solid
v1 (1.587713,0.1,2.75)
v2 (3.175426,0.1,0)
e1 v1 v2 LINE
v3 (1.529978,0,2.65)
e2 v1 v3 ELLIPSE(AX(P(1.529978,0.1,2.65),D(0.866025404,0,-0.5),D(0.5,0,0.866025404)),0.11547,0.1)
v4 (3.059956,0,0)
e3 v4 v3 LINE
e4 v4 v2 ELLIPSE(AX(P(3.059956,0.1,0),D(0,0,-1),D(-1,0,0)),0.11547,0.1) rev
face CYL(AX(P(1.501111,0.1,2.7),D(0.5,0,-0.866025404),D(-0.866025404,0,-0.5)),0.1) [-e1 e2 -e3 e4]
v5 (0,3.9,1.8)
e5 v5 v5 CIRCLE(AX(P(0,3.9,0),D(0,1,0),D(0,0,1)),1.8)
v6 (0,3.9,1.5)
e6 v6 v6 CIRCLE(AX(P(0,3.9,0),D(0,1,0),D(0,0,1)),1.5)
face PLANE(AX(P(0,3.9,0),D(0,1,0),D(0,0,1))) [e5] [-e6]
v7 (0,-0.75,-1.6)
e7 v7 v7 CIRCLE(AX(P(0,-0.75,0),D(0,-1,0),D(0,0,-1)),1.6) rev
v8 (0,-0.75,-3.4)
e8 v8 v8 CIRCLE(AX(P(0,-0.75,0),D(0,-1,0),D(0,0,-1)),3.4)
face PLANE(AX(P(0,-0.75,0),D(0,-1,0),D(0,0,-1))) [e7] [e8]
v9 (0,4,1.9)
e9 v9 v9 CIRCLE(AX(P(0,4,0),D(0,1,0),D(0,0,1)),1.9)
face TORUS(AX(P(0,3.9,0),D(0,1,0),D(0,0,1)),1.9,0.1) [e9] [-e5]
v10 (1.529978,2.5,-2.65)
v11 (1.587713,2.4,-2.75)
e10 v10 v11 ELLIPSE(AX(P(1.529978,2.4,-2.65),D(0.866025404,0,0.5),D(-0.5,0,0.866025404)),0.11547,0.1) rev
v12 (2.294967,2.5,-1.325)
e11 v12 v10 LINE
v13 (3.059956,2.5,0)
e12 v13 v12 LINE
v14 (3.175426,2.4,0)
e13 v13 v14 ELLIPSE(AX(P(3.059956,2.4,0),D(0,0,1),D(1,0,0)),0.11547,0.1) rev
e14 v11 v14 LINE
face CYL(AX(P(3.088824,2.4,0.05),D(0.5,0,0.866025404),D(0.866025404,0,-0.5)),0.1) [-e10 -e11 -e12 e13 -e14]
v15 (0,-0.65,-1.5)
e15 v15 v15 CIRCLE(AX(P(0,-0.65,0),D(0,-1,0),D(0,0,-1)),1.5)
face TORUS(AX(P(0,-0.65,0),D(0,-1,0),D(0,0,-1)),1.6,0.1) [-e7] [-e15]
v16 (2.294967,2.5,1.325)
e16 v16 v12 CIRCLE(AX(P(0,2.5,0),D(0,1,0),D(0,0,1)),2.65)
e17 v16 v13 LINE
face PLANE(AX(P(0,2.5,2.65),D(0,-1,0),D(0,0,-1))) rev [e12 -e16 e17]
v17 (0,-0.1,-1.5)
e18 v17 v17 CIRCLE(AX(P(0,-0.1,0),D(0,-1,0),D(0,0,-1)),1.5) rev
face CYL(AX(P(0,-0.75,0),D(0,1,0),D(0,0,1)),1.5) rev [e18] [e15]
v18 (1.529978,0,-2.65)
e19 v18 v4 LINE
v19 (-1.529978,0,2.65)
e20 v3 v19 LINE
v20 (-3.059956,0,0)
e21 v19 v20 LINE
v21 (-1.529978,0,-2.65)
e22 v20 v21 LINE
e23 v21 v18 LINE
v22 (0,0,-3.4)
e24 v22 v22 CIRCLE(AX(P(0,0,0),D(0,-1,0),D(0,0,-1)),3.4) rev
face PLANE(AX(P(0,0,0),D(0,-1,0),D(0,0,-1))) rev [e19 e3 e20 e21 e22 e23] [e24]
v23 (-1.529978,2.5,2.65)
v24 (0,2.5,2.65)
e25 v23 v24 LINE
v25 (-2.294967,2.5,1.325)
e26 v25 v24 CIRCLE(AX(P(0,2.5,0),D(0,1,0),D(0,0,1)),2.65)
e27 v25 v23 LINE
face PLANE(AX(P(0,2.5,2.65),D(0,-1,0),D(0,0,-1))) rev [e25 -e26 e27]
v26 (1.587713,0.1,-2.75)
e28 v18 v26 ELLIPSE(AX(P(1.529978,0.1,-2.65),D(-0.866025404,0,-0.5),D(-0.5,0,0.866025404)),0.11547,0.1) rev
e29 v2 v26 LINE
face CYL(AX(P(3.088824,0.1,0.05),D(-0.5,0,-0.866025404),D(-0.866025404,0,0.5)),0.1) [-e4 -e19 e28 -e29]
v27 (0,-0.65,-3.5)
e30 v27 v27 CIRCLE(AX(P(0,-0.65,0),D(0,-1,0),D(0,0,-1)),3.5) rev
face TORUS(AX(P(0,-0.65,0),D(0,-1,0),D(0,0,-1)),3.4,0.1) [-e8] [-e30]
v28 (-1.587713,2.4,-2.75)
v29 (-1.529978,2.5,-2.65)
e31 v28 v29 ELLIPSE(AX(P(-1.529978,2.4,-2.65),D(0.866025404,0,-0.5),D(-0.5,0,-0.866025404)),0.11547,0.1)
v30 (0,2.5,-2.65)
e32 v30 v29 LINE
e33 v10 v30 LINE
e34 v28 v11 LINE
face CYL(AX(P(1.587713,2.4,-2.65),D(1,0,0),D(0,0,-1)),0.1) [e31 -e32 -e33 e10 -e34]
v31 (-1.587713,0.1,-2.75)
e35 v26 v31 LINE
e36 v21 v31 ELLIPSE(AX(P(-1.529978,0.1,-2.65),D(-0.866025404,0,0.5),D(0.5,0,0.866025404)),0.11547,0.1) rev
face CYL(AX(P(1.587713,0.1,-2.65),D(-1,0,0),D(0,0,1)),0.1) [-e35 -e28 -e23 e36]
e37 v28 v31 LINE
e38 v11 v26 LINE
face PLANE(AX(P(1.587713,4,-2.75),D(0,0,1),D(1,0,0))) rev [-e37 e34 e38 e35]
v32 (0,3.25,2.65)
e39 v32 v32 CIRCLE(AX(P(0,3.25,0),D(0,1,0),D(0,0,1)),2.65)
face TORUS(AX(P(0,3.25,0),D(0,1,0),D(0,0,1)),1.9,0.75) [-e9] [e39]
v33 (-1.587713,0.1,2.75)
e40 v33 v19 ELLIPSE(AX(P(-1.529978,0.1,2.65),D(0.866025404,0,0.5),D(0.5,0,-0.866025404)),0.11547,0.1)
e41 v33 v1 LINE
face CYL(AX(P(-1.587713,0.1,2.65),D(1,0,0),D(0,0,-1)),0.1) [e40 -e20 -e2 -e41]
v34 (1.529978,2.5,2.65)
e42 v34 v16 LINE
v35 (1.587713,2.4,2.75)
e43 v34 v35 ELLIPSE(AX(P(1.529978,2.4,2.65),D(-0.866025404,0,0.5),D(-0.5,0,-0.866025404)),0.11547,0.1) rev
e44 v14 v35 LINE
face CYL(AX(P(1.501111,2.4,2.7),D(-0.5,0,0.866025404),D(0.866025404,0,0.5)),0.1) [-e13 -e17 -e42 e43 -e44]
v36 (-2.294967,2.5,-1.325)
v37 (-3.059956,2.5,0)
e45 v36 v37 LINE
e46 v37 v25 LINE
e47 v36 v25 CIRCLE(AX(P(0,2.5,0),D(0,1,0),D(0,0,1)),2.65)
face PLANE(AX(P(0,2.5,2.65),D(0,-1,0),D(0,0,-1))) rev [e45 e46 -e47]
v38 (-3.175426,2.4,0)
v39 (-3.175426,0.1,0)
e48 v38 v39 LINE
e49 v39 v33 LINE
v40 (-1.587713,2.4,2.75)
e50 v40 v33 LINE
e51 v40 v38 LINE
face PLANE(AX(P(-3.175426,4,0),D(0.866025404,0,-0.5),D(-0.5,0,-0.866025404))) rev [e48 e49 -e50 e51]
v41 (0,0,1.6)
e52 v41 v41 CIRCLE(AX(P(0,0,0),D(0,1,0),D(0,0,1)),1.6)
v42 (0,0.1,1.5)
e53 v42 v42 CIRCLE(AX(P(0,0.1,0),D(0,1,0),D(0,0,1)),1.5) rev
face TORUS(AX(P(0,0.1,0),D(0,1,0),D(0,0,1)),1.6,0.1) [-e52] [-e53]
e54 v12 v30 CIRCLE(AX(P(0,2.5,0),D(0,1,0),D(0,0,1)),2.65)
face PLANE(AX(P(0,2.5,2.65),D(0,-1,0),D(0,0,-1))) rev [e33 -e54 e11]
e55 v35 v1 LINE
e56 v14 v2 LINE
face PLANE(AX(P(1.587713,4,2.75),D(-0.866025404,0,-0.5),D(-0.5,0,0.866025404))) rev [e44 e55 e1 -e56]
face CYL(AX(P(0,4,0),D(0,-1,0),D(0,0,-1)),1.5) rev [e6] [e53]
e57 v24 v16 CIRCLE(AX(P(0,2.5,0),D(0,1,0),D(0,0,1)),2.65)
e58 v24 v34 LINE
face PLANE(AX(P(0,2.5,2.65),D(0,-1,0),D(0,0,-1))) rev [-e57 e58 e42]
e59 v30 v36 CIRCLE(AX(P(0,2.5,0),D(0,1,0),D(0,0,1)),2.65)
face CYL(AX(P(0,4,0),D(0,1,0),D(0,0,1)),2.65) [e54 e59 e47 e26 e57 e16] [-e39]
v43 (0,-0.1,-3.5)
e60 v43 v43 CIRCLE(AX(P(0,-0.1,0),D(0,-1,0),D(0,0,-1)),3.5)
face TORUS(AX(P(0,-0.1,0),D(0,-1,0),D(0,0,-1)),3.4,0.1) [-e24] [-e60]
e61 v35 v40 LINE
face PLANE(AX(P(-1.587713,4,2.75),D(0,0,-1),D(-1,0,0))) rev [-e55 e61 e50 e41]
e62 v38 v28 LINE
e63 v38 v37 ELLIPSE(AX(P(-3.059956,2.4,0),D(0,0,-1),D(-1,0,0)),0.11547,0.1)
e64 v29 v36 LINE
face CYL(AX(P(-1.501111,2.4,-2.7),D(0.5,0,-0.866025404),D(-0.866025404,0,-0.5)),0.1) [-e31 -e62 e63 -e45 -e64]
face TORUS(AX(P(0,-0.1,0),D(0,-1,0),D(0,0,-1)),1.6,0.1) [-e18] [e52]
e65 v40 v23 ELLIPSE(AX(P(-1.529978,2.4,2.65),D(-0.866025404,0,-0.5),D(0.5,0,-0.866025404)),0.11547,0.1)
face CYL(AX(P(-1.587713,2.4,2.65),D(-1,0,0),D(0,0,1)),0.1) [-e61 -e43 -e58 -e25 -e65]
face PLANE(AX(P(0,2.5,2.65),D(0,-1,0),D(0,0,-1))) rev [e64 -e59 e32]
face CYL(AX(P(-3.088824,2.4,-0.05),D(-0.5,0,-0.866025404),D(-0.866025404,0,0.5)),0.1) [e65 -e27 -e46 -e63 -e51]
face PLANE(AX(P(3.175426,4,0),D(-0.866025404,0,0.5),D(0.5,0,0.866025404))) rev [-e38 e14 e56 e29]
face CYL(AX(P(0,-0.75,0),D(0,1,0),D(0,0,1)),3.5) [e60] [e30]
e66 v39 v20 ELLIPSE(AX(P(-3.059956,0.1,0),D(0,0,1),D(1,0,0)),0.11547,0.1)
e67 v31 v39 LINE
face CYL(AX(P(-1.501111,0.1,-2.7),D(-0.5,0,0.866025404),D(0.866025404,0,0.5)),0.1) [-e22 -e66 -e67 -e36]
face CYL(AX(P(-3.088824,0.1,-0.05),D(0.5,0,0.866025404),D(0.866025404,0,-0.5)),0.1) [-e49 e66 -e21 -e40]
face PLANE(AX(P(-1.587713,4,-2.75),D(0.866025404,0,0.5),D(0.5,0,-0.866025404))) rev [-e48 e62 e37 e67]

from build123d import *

# Parameters (mm, degrees)
SKETCH1_R           = 1.5
BOSS_EXTRUDE1_DEPTH = 4
FILLET1_R           = 0.1
CUT_EXTRUDE1_START  = -0.1
SKETCH3_R           = 1.8
SKETCH3_R_2         = 1.5
CUT_EXTRUDE1_DEPTH  = 0.1
FILLET2_R           = 0.1
BOSS_EXTRUDE2_START = 0.75
SKETCH4_R           = 3.5
SKETCH4_R_2         = 1.5
BOSS_EXTRUDE2_DEPTH = 0.75
FILLET3_R           = 0.1


# Some blends are built 0.0001 mm under size
with BuildPart() as part:
    # Sketch1 → Boss-Extrude1 (new body)
    with BuildSketch(Plane(origin=(0, 0, 0), x_dir=(1, 0, 0), z_dir=(0, 1, 0))):
        Polygon((1.58771324, -2.75), (3.175426481, 0), (1.58771324, 2.75), (-1.58771324, 2.75), (-3.175426481, 0), (-1.58771324, -2.75), align=None)
        with Locations(Location((0, 0, 0), (0, 0, 270))):
            Circle(SKETCH1_R, mode=Mode.SUBTRACT)
    extrude(amount=BOSS_EXTRUDE1_DEPTH)

    # Sketch2 → Cut-Revolve3 (revolve, cut)
    with BuildSketch(Plane(origin=(0, 0, 0), x_dir=(0, 0, -1), z_dir=(1, 0, 0))):
        with BuildLine():
            Line((-2.65, 3.25), (-2.65, 2.5))
            Line((-2.65, 2.5), (-5.25, 2.5))
            Line((-5.25, 2.5), (-5.25, 4))
            Line((-5.25, 4), (-5.25, 4.1))
            Line((-5.25, 4.1), (-1.9, 4.1))
            Line((-1.9, 4.1), (-1.9, 4))
            ThreePointArc((-1.9, 4), (-2.430330086, 3.780330086), (-2.65, 3.25))
        make_face()
    revolve(axis=Axis((0, 4, 0), (0, -1, 0)), mode=Mode.SUBTRACT)

    # Fillet1
    fillet1_edges = [part.edges().sort_by_distance(p)[0] for p in [
        (0, 0, -1.5),
        (-2.38156986, 2.5, 1.375),
        (2.38156986, 2.5, 1.375),
        (0, 2.5, 2.75),
        (-2.38156986, 2.5, -1.375),
        (0, 2.5, -2.75),
        (2.38156986, 2.5, -1.375),
        (-2.38156986, 0, 1.375),
        (-2.38156986, 0, -1.375),
        (0, 0, -2.75),
        (2.38156986, 0, -1.375),
        (2.38156986, 0, 1.375),
        (0, 0, 2.75),
    ]]
    fillet(fillet1_edges, radius=FILLET1_R - 0.0001)  # a hair under: the kernel refuses the full size

    # Sketch3 → Cut-Extrude1 (cut)
    with BuildSketch(Plane(origin=(0, 4, 0), x_dir=(1, 0, 0), z_dir=(0, 1, 0)).offset(CUT_EXTRUDE1_START)):
        with Locations(Location((0, 0, 0), (0, 0, 270))):
            Circle(SKETCH3_R)
        with Locations(Location((0, 0, 0), (0, 0, 270))):
            Circle(SKETCH3_R_2, mode=Mode.SUBTRACT)
    extrude(amount=CUT_EXTRUDE1_DEPTH, mode=Mode.SUBTRACT)

    # Fillet2
    fillet2_edges = [part.edges().sort_by_distance(p)[0] for p in [
        (0, 4, -1.8),
    ]]
    fillet(fillet2_edges, radius=FILLET2_R - 0.0001)  # a hair under: the kernel refuses the full size

    # Sketch4 → Boss-Extrude2 (add)
    with BuildSketch(Plane.XZ.offset(BOSS_EXTRUDE2_START)):
        with Locations(Location((0, 0, 0), (0, 0, 270))):
            Circle(SKETCH4_R)
        with Locations(Location((0, 0, 0), (0, 0, 90))):
            Circle(SKETCH4_R_2, mode=Mode.SUBTRACT)
    extrude(amount=-BOSS_EXTRUDE2_DEPTH)

    # Fillet3
    # the kernel refuses this fillet: 0.1 mm, written as the material it takes off along each edge
    with BuildSketch(Plane(origin=(0, 0, 0), x_dir=(0, 0, 1), z_dir=(1, 0, 0))) as fillet3_piece_1:
        with BuildLine():
            CenterArc((1.5 + FILLET3_R, FILLET3_R), FILLET3_R, 180, 90)
            Line((1.5 + FILLET3_R, 0), (1.5, 0))
            Line((1.5, 0), (1.5, FILLET3_R))
        make_face()
    revolve(axis=Axis((0, 0, 0), (0, -1, 0)), mode=Mode.SUBTRACT)
    with BuildSketch(Plane(origin=(0, 0, 0), x_dir=(0, 0, -1), z_dir=(-1, 0, 0))) as fillet3_piece_2:
        with BuildLine():
            CenterArc((3.5 - FILLET3_R, FILLET3_R), FILLET3_R, 270, 90)
            Line((3.5 - FILLET3_R, 0), (3.5, 0))
            Line((3.5, 0), (3.5, FILLET3_R))
        make_face()
    revolve(axis=Axis((0, 0, 0), (0, -1, 0)), mode=Mode.SUBTRACT)
    with BuildSketch(Plane(origin=(0, -0.75, 0), x_dir=(0, 0, 1), z_dir=(1, 0, 0))) as fillet3_piece_3:
        with BuildLine():
            CenterArc((1.5 + FILLET3_R, -FILLET3_R), FILLET3_R, 90, 90)
            Line((1.5, -FILLET3_R), (1.5, 0))
            Line((1.5, 0), (1.5 + FILLET3_R, 0))
        make_face()
    revolve(axis=Axis((0, -0.75, 0), (0, -1, 0)), mode=Mode.SUBTRACT)
    with BuildSketch(Plane(origin=(0, -0.75, 0), x_dir=(0, 0, -1), z_dir=(-1, 0, 0))) as fillet3_piece_4:
        with BuildLine():
            CenterArc((3.5 - FILLET3_R, -FILLET3_R), FILLET3_R, 0, 90)
            Line((3.5 - FILLET3_R, 0), (3.5, 0))
            Line((3.5, 0), (3.5, -FILLET3_R))
        make_face()
    revolve(axis=Axis((0, -0.75, 0), (0, -1, 0)), mode=Mode.SUBTRACT)


solid = part.part
